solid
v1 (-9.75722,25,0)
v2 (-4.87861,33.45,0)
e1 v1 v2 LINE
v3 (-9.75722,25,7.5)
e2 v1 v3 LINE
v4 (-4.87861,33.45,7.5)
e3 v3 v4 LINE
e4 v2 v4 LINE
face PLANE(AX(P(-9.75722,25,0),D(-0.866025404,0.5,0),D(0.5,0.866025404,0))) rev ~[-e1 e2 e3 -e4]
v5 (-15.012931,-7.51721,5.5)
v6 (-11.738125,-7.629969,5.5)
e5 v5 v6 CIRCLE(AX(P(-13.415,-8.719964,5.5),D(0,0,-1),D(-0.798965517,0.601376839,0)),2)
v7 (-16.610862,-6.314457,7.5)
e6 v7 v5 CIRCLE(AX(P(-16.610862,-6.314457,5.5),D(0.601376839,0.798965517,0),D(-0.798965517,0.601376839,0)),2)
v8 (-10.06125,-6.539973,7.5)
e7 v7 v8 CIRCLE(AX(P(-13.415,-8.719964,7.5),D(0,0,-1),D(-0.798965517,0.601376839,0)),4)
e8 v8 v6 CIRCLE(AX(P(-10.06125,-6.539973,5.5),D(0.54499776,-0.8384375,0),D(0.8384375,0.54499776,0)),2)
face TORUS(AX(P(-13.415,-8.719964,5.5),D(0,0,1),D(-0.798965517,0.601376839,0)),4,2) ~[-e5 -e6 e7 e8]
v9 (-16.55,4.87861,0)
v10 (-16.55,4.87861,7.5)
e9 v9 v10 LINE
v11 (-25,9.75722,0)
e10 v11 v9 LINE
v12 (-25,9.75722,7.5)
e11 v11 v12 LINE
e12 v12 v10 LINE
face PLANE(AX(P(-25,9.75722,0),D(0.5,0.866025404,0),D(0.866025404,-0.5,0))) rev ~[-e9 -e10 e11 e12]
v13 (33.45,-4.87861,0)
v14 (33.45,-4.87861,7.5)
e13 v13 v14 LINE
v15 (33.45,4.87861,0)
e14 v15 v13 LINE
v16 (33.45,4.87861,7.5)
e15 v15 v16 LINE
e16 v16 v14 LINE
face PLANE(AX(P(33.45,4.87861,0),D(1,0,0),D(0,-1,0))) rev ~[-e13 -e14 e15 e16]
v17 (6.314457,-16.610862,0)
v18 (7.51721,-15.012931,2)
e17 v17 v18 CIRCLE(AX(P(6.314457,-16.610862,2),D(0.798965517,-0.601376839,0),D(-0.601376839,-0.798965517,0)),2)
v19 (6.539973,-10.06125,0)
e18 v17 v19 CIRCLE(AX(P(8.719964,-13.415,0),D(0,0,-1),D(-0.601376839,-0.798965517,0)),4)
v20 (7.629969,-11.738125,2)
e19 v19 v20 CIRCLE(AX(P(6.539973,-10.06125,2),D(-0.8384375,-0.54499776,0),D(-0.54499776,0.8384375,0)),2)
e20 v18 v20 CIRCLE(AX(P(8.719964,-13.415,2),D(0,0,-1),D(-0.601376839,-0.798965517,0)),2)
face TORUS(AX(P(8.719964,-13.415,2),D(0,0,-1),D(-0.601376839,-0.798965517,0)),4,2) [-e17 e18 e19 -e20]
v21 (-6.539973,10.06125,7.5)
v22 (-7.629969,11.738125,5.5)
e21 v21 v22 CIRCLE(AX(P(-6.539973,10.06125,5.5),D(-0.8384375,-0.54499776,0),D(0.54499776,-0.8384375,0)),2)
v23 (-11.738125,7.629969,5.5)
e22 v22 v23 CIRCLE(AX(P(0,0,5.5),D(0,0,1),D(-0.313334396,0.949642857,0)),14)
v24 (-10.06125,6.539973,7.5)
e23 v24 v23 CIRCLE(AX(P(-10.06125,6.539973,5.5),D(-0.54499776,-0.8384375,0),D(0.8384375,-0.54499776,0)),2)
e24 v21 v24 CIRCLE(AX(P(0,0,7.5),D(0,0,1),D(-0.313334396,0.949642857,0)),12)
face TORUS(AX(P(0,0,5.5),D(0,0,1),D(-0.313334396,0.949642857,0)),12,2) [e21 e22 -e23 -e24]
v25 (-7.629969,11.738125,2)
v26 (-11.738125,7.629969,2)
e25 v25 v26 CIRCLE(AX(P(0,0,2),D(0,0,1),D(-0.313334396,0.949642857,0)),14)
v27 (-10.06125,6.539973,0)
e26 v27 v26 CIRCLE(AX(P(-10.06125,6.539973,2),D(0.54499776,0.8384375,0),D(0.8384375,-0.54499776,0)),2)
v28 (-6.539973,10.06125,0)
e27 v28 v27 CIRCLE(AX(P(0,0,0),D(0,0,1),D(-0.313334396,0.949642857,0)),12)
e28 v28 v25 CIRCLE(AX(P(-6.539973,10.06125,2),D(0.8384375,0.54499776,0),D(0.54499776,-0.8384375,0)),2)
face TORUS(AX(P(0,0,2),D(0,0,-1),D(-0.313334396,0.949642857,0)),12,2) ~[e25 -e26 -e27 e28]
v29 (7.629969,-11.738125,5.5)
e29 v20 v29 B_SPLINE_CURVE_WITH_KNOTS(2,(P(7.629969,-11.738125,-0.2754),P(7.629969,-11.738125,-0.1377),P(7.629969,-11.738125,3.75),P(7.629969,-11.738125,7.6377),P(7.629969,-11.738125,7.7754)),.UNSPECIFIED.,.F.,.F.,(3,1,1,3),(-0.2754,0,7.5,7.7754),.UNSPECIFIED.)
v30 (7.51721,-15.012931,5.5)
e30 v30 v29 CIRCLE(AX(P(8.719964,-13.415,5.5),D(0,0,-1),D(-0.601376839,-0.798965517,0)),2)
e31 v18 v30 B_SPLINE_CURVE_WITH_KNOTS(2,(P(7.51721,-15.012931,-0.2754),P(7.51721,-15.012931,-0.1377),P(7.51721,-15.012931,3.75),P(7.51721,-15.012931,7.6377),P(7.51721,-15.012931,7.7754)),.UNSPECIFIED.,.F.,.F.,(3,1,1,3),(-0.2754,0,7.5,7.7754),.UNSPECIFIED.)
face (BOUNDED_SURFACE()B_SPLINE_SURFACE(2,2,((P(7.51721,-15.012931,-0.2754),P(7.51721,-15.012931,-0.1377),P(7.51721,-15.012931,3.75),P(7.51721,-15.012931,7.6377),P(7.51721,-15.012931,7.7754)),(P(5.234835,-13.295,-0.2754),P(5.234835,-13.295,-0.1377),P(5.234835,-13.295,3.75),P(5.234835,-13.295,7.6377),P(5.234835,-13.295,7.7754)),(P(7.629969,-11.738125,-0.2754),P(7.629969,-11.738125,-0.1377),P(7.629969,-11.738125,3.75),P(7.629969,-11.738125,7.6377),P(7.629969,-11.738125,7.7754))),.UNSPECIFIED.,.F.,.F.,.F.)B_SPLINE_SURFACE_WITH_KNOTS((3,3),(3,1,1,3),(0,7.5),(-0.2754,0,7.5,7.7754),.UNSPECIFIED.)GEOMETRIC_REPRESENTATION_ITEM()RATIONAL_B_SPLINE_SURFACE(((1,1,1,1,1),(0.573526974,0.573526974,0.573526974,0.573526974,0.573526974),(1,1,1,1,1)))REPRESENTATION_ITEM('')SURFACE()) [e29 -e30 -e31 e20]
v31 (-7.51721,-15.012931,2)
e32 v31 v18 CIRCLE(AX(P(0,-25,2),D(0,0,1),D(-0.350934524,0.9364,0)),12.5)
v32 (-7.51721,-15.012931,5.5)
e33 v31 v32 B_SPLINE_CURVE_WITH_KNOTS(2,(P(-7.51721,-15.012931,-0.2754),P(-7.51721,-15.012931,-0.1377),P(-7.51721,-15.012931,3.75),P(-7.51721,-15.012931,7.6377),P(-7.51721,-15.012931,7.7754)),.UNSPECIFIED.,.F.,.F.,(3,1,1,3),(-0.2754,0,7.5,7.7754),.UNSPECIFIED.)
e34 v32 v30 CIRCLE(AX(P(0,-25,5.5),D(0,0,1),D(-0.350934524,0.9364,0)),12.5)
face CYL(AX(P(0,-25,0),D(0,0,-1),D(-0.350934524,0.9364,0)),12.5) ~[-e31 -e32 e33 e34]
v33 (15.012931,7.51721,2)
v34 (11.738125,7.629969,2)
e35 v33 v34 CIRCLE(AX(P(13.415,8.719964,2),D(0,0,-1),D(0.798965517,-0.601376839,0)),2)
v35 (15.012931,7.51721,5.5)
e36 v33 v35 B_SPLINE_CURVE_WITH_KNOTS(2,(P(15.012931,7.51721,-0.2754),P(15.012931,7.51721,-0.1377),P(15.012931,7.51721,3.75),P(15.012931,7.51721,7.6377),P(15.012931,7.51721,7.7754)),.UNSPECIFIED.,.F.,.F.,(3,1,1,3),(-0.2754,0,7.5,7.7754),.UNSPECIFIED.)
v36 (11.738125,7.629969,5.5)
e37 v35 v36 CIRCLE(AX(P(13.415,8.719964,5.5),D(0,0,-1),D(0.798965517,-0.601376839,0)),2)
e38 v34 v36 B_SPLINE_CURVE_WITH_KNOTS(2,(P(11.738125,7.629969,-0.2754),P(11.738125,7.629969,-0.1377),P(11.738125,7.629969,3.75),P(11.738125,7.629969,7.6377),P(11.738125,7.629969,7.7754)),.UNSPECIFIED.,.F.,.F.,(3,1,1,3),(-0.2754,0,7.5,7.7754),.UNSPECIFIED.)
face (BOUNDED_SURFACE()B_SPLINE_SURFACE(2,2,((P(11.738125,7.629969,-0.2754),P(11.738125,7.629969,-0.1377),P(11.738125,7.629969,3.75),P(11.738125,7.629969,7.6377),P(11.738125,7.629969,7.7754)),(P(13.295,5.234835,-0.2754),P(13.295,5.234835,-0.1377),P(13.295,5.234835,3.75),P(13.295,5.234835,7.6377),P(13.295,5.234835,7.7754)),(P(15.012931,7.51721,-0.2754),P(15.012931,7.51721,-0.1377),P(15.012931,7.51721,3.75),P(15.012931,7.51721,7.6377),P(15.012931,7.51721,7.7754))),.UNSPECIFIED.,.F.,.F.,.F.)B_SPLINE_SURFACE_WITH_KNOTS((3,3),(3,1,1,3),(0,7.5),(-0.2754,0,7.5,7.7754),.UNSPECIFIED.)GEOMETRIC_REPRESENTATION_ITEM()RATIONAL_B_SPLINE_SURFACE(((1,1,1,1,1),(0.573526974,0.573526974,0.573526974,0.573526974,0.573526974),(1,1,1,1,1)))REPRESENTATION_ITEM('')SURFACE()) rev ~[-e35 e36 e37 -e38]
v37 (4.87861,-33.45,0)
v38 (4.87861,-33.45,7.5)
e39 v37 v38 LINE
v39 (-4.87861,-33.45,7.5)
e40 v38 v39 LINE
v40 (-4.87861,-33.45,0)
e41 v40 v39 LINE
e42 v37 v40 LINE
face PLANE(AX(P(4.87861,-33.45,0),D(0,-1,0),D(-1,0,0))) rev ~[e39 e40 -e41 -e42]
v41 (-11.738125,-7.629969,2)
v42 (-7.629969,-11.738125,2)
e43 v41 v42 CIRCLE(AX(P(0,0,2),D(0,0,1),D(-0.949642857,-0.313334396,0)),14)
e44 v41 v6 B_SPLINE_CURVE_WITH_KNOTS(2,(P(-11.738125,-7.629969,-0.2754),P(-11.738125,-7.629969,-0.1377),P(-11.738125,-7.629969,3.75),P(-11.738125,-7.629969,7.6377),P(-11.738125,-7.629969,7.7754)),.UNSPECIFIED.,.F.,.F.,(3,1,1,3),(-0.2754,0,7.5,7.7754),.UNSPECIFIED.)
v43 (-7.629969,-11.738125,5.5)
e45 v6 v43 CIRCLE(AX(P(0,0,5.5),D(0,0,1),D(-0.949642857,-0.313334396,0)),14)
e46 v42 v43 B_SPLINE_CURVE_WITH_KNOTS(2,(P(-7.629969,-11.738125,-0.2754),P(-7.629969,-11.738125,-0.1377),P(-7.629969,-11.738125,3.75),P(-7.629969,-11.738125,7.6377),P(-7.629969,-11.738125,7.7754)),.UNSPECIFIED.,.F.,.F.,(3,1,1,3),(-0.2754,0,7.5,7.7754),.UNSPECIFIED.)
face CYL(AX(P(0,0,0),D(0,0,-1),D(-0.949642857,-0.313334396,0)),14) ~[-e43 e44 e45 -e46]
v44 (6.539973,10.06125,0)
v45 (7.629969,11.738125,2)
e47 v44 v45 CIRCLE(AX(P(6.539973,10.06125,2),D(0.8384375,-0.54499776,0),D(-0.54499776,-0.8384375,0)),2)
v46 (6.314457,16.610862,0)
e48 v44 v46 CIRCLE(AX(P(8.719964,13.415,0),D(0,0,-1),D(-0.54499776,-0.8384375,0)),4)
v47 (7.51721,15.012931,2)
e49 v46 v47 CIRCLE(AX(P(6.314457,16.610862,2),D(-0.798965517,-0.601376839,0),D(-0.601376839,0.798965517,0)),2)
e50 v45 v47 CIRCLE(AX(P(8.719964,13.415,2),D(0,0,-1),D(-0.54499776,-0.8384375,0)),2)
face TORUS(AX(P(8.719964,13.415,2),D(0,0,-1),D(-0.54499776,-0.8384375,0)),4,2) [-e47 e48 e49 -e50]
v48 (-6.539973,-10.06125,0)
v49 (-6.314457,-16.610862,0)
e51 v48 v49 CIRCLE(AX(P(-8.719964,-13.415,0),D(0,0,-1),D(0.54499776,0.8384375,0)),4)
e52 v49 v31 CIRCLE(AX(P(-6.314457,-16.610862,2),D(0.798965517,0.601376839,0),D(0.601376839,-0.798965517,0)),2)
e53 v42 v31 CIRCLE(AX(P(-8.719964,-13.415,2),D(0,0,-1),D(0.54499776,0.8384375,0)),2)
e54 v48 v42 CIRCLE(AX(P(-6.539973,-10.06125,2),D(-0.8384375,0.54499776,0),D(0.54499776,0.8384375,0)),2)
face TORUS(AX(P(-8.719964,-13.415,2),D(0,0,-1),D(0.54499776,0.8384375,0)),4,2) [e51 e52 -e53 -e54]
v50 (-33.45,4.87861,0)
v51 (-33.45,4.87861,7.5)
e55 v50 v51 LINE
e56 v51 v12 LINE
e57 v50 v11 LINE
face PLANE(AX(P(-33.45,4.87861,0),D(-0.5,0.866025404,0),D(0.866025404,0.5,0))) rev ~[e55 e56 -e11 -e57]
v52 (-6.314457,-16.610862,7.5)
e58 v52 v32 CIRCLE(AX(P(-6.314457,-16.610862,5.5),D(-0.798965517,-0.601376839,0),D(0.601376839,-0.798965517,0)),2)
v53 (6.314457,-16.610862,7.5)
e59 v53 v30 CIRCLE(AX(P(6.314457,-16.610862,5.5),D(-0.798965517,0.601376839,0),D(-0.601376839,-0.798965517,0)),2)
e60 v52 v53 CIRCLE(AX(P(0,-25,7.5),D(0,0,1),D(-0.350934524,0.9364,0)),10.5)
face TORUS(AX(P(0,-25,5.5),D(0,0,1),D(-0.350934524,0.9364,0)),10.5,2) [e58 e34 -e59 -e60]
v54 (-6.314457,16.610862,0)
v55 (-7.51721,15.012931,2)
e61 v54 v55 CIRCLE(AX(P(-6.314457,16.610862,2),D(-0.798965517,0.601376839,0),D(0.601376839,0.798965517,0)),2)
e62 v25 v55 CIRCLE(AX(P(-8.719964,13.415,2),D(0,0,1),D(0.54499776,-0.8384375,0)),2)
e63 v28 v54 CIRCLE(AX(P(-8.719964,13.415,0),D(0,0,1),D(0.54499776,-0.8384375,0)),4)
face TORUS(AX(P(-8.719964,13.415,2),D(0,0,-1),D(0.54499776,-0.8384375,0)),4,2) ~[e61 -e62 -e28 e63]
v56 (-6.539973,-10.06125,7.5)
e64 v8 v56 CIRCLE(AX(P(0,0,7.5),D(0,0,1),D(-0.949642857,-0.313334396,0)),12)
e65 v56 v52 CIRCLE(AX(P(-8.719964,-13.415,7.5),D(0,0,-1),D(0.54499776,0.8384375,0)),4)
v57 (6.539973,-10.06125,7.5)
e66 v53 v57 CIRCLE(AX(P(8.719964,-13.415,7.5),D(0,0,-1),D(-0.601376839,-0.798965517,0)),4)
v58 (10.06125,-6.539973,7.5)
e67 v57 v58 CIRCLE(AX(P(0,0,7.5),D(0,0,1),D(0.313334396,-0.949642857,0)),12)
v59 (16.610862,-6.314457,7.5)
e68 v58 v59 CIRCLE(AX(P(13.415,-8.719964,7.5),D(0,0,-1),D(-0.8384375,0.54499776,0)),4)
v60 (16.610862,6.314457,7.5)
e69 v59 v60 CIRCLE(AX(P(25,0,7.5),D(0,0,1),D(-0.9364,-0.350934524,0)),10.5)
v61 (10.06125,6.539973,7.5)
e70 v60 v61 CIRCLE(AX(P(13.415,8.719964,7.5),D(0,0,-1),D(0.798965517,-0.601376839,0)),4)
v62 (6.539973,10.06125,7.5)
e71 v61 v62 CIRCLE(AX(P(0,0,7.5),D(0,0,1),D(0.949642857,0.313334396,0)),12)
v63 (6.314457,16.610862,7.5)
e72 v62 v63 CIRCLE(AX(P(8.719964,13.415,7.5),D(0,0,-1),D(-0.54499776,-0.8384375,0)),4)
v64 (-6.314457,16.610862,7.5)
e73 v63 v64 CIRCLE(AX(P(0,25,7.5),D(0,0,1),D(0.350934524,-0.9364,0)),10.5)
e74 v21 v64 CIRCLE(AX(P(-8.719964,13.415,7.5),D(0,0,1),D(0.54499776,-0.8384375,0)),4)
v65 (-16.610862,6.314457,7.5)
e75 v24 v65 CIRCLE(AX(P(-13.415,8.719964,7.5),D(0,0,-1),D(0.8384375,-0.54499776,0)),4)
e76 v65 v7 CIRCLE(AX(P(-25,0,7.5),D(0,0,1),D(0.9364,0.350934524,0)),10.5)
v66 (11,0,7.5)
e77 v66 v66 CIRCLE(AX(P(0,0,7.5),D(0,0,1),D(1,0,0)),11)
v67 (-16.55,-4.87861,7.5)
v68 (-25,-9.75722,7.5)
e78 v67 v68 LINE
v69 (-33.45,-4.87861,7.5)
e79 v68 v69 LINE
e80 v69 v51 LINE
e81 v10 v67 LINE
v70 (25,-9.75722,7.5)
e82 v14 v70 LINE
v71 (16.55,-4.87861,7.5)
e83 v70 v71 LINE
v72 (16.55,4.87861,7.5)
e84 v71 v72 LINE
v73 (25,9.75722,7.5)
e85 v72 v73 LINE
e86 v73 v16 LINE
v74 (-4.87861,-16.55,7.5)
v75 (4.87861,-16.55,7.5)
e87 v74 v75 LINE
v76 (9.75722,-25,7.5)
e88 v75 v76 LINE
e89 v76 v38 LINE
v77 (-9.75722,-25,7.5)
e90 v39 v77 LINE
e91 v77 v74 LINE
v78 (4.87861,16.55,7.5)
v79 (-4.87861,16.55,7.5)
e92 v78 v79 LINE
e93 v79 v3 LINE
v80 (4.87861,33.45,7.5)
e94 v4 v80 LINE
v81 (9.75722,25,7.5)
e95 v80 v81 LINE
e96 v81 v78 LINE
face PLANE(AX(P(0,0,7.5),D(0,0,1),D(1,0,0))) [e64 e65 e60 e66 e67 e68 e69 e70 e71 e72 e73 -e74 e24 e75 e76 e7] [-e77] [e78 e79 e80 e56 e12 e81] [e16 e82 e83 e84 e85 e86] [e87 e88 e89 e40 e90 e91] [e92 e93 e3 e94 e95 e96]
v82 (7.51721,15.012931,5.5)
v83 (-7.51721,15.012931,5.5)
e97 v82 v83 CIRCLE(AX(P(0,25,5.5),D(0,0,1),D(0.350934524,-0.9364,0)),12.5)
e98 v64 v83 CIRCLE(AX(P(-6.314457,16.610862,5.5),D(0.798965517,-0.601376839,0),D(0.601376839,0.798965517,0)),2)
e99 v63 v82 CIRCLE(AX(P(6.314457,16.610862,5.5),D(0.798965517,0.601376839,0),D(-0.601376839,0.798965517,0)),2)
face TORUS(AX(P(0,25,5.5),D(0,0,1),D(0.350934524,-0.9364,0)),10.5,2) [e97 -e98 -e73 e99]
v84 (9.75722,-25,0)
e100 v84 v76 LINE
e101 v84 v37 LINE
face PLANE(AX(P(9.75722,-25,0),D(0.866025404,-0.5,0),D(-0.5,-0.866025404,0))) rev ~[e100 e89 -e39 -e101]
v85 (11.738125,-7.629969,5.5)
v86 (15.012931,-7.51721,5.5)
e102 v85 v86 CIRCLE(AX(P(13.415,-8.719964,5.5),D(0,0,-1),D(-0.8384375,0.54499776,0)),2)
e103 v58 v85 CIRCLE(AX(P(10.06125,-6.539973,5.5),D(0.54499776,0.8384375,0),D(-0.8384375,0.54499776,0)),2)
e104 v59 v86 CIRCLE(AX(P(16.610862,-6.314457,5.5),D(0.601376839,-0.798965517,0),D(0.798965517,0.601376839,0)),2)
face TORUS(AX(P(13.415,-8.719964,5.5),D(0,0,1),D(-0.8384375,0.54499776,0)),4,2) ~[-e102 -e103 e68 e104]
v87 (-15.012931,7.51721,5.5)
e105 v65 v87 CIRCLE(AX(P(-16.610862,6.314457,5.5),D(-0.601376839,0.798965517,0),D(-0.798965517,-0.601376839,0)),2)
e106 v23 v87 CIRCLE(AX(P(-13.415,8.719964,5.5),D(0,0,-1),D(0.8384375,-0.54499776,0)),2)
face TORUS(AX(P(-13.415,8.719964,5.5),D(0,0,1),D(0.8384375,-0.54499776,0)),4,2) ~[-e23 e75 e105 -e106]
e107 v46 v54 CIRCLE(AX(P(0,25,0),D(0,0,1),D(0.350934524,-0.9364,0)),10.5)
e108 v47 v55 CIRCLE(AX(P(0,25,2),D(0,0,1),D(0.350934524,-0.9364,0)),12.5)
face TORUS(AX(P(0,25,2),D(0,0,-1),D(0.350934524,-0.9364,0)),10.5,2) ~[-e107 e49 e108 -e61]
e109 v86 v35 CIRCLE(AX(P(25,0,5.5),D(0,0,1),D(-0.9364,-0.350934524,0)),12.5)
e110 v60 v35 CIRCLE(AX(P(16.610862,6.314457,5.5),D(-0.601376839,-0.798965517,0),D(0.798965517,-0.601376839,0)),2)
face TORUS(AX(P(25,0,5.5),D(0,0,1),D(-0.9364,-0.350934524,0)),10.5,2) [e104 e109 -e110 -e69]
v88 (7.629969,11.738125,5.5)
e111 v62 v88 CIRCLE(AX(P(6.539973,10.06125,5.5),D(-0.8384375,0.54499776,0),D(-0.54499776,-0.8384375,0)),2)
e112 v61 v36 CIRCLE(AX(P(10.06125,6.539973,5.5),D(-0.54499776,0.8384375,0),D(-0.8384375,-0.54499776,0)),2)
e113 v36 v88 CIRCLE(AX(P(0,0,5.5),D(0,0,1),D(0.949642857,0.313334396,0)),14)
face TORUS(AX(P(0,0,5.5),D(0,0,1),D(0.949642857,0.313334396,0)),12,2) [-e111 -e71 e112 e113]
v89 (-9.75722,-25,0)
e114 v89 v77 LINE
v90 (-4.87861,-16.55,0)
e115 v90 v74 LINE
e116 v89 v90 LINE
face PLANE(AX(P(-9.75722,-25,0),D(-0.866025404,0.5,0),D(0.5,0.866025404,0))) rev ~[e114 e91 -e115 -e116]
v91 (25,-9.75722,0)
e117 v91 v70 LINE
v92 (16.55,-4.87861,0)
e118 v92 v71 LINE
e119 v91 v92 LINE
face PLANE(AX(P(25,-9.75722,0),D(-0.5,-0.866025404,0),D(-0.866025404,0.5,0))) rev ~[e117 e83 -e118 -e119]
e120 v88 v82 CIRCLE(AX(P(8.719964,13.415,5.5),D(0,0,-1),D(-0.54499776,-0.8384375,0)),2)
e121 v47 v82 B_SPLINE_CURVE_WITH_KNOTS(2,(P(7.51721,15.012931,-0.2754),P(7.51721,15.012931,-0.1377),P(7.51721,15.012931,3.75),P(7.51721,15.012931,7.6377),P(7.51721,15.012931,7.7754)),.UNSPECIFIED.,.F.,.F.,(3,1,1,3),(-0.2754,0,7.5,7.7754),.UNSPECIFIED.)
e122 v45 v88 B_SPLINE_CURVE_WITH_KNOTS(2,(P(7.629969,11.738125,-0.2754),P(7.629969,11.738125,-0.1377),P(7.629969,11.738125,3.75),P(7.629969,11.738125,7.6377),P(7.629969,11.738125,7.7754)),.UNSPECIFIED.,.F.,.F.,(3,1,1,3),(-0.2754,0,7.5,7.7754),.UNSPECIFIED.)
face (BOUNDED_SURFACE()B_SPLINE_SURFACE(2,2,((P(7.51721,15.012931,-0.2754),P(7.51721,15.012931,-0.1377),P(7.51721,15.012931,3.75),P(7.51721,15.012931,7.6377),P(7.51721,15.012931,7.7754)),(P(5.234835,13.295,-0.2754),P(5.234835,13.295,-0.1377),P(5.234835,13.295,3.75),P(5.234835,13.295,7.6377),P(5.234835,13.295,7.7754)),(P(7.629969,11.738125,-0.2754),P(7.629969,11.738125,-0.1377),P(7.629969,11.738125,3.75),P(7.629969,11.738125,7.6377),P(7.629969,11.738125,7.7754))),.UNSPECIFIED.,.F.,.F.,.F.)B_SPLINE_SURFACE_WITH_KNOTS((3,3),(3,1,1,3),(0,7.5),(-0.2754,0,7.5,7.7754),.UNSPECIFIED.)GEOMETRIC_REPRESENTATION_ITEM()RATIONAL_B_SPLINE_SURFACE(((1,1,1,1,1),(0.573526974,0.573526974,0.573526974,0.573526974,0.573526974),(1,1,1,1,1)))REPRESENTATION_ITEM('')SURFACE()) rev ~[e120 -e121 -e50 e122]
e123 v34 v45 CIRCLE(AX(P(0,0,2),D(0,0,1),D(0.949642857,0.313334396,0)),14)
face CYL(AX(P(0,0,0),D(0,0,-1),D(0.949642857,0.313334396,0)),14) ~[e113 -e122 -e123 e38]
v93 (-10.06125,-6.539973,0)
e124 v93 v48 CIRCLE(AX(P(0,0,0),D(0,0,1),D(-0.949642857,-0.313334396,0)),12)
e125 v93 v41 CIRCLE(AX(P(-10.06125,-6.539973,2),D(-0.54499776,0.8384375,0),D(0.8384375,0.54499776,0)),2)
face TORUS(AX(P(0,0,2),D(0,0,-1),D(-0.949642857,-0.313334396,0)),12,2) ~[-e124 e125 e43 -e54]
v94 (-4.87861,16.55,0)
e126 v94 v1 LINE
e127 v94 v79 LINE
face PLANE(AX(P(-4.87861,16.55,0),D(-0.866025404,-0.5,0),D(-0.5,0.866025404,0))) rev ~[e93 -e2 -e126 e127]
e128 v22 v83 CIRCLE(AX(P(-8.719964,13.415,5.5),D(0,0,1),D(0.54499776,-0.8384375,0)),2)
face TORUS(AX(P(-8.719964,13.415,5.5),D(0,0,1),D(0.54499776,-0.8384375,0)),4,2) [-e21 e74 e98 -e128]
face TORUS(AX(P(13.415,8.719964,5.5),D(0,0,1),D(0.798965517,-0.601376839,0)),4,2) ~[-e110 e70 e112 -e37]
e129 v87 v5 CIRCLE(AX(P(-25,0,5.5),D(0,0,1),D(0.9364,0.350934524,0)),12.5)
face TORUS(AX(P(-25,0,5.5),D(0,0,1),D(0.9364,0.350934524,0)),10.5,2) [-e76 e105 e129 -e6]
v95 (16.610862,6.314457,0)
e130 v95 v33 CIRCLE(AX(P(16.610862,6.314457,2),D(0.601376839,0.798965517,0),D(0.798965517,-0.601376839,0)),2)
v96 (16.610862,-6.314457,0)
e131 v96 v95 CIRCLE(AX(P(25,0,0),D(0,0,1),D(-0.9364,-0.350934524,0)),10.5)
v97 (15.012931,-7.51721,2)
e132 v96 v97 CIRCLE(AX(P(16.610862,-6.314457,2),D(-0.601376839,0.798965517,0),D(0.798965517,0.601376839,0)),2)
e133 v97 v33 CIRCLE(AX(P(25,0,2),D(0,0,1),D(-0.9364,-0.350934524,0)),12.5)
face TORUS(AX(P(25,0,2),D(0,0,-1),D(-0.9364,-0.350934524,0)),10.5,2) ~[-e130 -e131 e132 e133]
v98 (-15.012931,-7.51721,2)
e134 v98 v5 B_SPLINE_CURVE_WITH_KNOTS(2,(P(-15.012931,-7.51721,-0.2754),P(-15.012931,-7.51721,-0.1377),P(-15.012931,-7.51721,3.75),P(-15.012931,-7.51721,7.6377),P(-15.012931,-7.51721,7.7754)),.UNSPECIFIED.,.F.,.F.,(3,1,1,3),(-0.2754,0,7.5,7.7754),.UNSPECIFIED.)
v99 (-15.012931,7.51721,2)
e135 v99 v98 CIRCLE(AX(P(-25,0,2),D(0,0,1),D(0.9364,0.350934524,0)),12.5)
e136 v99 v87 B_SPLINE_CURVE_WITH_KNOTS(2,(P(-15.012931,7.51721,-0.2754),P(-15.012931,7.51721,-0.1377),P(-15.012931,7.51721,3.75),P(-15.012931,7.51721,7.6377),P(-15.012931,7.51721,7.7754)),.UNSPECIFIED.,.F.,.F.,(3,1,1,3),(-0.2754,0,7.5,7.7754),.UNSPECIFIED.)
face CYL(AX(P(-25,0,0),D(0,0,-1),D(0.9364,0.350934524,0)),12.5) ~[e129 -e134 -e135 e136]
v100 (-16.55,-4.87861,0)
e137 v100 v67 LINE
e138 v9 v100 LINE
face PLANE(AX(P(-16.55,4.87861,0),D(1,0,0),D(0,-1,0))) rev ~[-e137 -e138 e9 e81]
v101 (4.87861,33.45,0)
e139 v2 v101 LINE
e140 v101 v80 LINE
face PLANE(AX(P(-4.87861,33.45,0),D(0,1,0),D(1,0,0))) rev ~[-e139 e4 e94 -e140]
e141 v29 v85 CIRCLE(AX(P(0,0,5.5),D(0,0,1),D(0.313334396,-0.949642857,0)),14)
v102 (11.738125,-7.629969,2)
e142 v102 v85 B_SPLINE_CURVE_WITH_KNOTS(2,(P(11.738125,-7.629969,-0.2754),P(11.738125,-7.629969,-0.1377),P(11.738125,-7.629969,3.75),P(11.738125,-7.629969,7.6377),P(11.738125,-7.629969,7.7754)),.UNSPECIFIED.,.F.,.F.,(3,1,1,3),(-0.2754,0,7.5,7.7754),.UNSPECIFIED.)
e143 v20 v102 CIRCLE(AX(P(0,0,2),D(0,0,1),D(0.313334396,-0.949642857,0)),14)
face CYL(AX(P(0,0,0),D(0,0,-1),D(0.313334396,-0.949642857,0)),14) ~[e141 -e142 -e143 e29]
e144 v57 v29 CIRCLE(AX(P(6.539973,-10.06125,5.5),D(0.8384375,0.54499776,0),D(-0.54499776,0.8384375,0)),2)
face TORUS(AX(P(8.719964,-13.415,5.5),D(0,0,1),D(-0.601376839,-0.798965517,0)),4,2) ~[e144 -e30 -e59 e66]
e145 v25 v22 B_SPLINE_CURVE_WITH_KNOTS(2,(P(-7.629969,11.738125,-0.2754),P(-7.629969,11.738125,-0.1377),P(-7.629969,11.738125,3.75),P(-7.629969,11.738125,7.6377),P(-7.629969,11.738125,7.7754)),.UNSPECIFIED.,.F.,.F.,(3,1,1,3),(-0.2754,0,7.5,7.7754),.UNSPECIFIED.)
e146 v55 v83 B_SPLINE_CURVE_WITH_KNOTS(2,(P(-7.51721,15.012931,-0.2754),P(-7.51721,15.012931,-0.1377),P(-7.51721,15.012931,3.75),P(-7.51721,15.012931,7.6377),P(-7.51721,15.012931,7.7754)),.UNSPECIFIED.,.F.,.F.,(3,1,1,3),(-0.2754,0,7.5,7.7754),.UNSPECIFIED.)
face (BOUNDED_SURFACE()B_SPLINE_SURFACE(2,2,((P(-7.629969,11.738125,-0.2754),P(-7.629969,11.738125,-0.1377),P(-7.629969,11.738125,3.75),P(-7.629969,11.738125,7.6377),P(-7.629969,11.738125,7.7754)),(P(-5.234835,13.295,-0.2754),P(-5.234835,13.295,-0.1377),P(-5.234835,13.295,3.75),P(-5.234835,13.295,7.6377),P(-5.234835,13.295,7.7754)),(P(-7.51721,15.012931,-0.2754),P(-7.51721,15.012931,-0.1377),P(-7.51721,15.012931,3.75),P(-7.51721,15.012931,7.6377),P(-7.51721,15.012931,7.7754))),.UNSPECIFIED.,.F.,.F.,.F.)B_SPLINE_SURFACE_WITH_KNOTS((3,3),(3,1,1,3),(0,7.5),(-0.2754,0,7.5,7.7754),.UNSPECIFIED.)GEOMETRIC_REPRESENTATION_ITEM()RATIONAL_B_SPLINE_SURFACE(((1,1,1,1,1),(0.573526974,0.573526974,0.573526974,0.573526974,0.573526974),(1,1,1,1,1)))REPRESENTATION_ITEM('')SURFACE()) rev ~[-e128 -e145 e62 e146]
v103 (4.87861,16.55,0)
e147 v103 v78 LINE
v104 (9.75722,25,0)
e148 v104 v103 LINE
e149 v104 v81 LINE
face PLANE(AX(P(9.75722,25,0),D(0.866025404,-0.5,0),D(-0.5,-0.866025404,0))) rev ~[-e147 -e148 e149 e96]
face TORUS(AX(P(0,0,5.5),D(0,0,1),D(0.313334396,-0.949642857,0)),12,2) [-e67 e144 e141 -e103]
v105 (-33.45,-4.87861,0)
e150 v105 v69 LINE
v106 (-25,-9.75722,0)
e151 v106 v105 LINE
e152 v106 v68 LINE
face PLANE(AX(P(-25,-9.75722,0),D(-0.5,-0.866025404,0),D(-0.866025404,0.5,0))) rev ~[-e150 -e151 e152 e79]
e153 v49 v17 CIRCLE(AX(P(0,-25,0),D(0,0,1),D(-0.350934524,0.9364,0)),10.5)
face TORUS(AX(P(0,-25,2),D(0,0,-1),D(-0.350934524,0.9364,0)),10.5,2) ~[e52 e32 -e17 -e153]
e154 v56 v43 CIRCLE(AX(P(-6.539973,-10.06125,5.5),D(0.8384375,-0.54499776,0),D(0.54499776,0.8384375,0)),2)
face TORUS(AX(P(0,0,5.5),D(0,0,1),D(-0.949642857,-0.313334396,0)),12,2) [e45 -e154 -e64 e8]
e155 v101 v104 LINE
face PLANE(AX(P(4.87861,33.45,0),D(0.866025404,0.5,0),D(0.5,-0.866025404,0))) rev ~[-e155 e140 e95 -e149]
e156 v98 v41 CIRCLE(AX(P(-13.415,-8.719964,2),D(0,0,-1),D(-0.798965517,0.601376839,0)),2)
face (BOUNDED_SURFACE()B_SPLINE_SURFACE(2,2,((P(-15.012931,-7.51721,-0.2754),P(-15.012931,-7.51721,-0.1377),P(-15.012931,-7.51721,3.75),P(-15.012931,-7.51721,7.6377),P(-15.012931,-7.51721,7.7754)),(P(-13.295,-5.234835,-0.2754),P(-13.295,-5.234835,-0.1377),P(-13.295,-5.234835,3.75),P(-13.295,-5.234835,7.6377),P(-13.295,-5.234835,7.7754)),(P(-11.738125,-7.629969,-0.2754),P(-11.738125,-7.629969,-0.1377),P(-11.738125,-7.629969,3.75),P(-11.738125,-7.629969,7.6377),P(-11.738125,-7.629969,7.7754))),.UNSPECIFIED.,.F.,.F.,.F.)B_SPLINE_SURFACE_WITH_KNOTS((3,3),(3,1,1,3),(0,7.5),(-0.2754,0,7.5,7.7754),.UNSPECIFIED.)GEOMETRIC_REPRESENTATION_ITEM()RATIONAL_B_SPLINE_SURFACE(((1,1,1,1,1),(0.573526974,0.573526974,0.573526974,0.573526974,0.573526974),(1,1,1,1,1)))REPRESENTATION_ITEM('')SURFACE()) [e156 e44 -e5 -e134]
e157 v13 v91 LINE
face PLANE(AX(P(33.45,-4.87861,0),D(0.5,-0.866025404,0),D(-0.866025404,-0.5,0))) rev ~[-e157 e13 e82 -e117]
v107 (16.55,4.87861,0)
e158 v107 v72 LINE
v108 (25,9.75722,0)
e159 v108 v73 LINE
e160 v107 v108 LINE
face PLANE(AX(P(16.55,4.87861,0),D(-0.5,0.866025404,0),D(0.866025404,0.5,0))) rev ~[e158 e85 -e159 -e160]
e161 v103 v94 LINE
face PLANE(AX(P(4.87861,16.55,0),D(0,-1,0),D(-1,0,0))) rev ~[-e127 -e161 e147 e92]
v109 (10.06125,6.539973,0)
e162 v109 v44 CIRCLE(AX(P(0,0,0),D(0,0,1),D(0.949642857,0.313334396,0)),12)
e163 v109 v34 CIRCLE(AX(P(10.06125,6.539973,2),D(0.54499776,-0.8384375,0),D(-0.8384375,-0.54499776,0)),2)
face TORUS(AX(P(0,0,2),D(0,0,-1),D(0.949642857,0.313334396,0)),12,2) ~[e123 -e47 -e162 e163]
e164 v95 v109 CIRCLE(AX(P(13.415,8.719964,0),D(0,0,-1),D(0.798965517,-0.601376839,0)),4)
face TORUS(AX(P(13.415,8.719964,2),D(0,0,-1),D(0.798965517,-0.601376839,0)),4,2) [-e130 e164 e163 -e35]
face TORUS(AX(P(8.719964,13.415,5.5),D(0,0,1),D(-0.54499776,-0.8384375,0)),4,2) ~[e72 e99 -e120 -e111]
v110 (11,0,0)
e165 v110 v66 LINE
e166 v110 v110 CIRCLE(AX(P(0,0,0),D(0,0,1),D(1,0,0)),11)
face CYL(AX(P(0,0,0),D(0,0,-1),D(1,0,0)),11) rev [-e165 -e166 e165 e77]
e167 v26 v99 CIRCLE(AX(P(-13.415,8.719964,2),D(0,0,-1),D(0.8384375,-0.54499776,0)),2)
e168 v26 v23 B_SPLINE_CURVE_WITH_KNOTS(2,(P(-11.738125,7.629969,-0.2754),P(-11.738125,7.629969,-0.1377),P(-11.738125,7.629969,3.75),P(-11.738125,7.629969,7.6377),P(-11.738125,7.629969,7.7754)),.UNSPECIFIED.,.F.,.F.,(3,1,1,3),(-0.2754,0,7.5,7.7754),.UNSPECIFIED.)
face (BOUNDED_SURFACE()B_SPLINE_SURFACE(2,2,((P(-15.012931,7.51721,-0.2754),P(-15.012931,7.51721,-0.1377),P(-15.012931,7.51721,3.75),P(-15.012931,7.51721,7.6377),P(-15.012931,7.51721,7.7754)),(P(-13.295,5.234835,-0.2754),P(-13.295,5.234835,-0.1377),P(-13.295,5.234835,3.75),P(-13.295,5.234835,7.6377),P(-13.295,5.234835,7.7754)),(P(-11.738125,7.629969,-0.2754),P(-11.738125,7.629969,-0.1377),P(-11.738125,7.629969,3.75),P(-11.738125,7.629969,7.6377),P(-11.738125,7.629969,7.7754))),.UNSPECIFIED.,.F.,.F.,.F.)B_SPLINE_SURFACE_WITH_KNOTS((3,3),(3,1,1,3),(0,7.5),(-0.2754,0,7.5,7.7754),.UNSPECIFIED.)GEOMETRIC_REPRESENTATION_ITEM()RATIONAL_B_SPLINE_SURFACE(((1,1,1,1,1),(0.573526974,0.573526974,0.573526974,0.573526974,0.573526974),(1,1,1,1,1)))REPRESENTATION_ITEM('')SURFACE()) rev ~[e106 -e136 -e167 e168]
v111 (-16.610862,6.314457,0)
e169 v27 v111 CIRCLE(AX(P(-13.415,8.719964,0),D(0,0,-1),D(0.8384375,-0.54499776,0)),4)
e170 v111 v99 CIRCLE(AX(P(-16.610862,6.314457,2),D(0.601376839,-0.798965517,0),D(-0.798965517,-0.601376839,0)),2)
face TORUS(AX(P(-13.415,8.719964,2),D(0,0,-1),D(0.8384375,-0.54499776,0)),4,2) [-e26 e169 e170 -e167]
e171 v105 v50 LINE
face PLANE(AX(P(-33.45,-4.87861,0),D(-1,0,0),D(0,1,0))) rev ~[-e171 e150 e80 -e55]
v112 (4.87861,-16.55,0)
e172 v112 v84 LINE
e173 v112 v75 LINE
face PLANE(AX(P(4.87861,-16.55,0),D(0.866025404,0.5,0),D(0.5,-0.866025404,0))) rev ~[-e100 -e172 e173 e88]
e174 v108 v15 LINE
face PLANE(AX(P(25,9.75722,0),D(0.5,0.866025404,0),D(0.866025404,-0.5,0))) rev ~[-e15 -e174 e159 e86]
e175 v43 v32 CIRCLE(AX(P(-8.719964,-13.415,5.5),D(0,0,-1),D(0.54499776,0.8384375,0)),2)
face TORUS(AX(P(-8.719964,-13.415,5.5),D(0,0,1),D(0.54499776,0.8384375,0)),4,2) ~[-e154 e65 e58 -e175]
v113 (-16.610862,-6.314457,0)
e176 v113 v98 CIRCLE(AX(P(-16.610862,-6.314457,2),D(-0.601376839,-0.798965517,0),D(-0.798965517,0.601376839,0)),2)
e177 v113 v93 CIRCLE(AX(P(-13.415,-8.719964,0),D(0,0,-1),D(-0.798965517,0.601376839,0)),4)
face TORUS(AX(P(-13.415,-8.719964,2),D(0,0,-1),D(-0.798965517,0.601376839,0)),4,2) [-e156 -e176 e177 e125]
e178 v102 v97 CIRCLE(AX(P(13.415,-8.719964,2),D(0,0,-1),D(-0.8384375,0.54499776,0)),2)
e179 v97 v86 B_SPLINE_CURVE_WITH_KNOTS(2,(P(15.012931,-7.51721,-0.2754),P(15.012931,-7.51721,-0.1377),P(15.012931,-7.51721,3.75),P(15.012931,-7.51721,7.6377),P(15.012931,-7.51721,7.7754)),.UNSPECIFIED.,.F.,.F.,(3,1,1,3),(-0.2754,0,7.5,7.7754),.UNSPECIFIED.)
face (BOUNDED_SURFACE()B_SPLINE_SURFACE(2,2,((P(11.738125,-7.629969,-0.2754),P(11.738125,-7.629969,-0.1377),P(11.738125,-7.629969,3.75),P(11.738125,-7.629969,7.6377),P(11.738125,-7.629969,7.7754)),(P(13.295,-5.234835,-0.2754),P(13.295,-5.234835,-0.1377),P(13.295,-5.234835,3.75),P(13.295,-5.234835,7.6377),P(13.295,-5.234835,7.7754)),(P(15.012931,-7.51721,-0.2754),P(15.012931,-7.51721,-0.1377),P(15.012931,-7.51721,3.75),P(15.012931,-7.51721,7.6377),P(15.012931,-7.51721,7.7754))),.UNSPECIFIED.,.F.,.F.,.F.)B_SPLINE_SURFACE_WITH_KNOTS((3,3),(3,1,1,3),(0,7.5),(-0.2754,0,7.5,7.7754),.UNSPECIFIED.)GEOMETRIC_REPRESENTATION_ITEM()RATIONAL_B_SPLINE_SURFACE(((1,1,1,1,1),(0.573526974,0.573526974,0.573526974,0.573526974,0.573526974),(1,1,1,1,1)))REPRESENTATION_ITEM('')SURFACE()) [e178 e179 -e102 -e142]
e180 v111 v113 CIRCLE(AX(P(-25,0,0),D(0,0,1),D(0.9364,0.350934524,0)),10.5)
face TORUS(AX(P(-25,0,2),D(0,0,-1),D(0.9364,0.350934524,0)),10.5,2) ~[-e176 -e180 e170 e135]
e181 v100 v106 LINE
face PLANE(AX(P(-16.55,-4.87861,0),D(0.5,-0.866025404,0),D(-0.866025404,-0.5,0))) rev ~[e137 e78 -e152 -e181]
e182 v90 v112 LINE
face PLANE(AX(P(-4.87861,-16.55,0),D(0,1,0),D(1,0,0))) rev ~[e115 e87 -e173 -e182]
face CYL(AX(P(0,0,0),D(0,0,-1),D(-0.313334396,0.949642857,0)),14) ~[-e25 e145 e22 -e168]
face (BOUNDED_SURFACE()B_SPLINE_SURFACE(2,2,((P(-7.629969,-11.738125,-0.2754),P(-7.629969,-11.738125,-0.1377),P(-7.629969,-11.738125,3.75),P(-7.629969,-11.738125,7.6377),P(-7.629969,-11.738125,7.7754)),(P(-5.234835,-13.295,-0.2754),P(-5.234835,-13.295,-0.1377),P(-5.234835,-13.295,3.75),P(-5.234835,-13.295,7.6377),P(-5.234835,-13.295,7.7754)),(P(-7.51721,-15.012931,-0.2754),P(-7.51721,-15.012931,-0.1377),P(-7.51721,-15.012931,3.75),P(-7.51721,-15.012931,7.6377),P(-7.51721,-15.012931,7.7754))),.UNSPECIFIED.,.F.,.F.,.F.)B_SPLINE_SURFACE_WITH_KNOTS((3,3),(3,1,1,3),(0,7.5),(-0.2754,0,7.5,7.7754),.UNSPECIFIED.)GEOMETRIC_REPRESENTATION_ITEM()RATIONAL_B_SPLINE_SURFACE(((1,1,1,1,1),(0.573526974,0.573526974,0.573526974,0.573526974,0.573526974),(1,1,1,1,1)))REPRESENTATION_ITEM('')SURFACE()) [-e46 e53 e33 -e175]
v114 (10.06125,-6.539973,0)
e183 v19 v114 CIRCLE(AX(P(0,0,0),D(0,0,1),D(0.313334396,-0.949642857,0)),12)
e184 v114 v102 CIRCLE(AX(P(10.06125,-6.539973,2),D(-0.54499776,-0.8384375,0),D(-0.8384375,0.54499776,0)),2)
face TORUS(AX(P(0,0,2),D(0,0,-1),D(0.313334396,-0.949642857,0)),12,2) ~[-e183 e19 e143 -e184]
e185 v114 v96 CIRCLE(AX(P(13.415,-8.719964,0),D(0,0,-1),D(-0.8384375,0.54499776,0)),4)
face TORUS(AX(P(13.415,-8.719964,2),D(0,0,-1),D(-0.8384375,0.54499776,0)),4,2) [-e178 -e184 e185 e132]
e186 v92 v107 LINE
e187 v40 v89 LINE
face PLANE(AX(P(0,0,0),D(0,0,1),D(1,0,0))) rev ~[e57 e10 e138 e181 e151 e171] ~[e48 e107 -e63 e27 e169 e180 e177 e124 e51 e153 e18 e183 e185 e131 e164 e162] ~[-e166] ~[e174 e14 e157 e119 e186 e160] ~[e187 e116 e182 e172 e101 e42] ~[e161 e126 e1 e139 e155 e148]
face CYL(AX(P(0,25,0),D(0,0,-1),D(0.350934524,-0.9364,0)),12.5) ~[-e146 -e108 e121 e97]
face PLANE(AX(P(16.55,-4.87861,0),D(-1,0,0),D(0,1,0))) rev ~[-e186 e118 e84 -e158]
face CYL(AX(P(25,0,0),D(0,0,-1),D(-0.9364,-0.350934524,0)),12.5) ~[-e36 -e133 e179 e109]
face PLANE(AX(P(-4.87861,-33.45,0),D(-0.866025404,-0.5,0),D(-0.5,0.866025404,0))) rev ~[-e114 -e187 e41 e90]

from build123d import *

# Parameters (mm, degrees)
F0_R     = 11
F1_DEPTH = 7.5
F2_R     = 2


# Not quite as in the source:
# - two fillets or chamfers of one size are made in one step


with BuildPart() as f1:
    # F0 (on Top) → F1 (new body)
    with BuildSketch(Plane.XY):
        with BuildLine():
            ThreePointArc((-13.295, 4.3866815476), (-37.5, 0), (-13.295, -4.3866815476))
            ThreePointArc((-13.295, -4.3866815476), (-9.8994949366, -9.8994949366), (-4.3866815476, -13.295))
            ThreePointArc((-4.3866815476, -13.295), (0, -37.5), (4.3866815476, -13.295))
            ThreePointArc((4.3866815476, -13.295), (9.8994949366, -9.8994949366), (13.295, -4.3866815476))
            ThreePointArc((13.295, -4.3866815476), (37.5, 0), (13.295, 4.3866815476))
            ThreePointArc((13.295, 4.3866815476), (9.8994949366, 9.8994949366), (4.3866815476, 13.295))
            ThreePointArc((4.3866815476, 13.295), (0, 37.5), (-4.3866815476, 13.295))
            ThreePointArc((-4.3866815476, 13.295), (-9.8994949366, 9.8994949366), (-13.295, 4.3866815476))
        make_face()
        Polygon((-9.7572195493, -25), (-4.8786097747, -16.55), (4.8786097747, -16.55), (9.7572195493, -25), (4.8786097747, -33.45), (-4.8786097747, -33.45), align=None, mode=Mode.SUBTRACT)
        Polygon((-25, 9.7572195493), (-16.55, 4.8786097747), (-16.55, -4.8786097747), (-25, -9.7572195493), (-33.45, -4.8786097747), (-33.45, 4.8786097747), align=None, mode=Mode.SUBTRACT)
        Circle(F0_R, mode=Mode.SUBTRACT)
        Polygon((16.55, 4.8786097747), (25, 9.7572195493), (33.45, 4.8786097747), (33.45, -4.8786097747), (25, -9.7572195493), (16.55, -4.8786097747), align=None, mode=Mode.SUBTRACT)
        Polygon((-9.7572195493, 25), (-4.8786097747, 33.45), (4.8786097747, 33.45), (9.7572195493, 25), (4.8786097747, 16.55), (-4.8786097747, 16.55), align=None, mode=Mode.SUBTRACT)
    extrude(amount=F1_DEPTH)

    # F2
    f2_edges = [f1.edges().sort_by_distance(p)[0] for p in [
        (-13.295, -4.386682, 3.75),
        (13.295, 4.386682, 3.75),
        (4.386682, -13.295, 3.75),
        (-4.386682, 13.295, 3.75),
        (-13.295, 4.386682, 3.75),
        (-9.899495, 9.899495, 0),
        (-9.899495, 9.899495, 7.5),
        (-37.5, 0, 0),
        (-37.5, 0, 7.5),
        (-4.386682, -13.295, 3.75),
        (-9.899495, -9.899495, 0),
        (-9.899495, -9.899495, 7.5),
        (0, -37.5, 0),
        (0, -37.5, 7.5),
        (13.295, -4.386682, 3.75),
        (9.899495, -9.899495, 0),
        (9.899495, -9.899495, 7.5),
        (37.5, 0, 0),
        (37.5, 0, 7.5),
        (4.386682, 13.295, 3.75),
        (9.899495, 9.899495, 0),
        (9.899495, 9.899495, 7.5),
        (0, 37.5, 0),
        (0, 37.5, 7.5),
    ]]
    fillet(f2_edges, radius=F2_R)


solid = f1.part
